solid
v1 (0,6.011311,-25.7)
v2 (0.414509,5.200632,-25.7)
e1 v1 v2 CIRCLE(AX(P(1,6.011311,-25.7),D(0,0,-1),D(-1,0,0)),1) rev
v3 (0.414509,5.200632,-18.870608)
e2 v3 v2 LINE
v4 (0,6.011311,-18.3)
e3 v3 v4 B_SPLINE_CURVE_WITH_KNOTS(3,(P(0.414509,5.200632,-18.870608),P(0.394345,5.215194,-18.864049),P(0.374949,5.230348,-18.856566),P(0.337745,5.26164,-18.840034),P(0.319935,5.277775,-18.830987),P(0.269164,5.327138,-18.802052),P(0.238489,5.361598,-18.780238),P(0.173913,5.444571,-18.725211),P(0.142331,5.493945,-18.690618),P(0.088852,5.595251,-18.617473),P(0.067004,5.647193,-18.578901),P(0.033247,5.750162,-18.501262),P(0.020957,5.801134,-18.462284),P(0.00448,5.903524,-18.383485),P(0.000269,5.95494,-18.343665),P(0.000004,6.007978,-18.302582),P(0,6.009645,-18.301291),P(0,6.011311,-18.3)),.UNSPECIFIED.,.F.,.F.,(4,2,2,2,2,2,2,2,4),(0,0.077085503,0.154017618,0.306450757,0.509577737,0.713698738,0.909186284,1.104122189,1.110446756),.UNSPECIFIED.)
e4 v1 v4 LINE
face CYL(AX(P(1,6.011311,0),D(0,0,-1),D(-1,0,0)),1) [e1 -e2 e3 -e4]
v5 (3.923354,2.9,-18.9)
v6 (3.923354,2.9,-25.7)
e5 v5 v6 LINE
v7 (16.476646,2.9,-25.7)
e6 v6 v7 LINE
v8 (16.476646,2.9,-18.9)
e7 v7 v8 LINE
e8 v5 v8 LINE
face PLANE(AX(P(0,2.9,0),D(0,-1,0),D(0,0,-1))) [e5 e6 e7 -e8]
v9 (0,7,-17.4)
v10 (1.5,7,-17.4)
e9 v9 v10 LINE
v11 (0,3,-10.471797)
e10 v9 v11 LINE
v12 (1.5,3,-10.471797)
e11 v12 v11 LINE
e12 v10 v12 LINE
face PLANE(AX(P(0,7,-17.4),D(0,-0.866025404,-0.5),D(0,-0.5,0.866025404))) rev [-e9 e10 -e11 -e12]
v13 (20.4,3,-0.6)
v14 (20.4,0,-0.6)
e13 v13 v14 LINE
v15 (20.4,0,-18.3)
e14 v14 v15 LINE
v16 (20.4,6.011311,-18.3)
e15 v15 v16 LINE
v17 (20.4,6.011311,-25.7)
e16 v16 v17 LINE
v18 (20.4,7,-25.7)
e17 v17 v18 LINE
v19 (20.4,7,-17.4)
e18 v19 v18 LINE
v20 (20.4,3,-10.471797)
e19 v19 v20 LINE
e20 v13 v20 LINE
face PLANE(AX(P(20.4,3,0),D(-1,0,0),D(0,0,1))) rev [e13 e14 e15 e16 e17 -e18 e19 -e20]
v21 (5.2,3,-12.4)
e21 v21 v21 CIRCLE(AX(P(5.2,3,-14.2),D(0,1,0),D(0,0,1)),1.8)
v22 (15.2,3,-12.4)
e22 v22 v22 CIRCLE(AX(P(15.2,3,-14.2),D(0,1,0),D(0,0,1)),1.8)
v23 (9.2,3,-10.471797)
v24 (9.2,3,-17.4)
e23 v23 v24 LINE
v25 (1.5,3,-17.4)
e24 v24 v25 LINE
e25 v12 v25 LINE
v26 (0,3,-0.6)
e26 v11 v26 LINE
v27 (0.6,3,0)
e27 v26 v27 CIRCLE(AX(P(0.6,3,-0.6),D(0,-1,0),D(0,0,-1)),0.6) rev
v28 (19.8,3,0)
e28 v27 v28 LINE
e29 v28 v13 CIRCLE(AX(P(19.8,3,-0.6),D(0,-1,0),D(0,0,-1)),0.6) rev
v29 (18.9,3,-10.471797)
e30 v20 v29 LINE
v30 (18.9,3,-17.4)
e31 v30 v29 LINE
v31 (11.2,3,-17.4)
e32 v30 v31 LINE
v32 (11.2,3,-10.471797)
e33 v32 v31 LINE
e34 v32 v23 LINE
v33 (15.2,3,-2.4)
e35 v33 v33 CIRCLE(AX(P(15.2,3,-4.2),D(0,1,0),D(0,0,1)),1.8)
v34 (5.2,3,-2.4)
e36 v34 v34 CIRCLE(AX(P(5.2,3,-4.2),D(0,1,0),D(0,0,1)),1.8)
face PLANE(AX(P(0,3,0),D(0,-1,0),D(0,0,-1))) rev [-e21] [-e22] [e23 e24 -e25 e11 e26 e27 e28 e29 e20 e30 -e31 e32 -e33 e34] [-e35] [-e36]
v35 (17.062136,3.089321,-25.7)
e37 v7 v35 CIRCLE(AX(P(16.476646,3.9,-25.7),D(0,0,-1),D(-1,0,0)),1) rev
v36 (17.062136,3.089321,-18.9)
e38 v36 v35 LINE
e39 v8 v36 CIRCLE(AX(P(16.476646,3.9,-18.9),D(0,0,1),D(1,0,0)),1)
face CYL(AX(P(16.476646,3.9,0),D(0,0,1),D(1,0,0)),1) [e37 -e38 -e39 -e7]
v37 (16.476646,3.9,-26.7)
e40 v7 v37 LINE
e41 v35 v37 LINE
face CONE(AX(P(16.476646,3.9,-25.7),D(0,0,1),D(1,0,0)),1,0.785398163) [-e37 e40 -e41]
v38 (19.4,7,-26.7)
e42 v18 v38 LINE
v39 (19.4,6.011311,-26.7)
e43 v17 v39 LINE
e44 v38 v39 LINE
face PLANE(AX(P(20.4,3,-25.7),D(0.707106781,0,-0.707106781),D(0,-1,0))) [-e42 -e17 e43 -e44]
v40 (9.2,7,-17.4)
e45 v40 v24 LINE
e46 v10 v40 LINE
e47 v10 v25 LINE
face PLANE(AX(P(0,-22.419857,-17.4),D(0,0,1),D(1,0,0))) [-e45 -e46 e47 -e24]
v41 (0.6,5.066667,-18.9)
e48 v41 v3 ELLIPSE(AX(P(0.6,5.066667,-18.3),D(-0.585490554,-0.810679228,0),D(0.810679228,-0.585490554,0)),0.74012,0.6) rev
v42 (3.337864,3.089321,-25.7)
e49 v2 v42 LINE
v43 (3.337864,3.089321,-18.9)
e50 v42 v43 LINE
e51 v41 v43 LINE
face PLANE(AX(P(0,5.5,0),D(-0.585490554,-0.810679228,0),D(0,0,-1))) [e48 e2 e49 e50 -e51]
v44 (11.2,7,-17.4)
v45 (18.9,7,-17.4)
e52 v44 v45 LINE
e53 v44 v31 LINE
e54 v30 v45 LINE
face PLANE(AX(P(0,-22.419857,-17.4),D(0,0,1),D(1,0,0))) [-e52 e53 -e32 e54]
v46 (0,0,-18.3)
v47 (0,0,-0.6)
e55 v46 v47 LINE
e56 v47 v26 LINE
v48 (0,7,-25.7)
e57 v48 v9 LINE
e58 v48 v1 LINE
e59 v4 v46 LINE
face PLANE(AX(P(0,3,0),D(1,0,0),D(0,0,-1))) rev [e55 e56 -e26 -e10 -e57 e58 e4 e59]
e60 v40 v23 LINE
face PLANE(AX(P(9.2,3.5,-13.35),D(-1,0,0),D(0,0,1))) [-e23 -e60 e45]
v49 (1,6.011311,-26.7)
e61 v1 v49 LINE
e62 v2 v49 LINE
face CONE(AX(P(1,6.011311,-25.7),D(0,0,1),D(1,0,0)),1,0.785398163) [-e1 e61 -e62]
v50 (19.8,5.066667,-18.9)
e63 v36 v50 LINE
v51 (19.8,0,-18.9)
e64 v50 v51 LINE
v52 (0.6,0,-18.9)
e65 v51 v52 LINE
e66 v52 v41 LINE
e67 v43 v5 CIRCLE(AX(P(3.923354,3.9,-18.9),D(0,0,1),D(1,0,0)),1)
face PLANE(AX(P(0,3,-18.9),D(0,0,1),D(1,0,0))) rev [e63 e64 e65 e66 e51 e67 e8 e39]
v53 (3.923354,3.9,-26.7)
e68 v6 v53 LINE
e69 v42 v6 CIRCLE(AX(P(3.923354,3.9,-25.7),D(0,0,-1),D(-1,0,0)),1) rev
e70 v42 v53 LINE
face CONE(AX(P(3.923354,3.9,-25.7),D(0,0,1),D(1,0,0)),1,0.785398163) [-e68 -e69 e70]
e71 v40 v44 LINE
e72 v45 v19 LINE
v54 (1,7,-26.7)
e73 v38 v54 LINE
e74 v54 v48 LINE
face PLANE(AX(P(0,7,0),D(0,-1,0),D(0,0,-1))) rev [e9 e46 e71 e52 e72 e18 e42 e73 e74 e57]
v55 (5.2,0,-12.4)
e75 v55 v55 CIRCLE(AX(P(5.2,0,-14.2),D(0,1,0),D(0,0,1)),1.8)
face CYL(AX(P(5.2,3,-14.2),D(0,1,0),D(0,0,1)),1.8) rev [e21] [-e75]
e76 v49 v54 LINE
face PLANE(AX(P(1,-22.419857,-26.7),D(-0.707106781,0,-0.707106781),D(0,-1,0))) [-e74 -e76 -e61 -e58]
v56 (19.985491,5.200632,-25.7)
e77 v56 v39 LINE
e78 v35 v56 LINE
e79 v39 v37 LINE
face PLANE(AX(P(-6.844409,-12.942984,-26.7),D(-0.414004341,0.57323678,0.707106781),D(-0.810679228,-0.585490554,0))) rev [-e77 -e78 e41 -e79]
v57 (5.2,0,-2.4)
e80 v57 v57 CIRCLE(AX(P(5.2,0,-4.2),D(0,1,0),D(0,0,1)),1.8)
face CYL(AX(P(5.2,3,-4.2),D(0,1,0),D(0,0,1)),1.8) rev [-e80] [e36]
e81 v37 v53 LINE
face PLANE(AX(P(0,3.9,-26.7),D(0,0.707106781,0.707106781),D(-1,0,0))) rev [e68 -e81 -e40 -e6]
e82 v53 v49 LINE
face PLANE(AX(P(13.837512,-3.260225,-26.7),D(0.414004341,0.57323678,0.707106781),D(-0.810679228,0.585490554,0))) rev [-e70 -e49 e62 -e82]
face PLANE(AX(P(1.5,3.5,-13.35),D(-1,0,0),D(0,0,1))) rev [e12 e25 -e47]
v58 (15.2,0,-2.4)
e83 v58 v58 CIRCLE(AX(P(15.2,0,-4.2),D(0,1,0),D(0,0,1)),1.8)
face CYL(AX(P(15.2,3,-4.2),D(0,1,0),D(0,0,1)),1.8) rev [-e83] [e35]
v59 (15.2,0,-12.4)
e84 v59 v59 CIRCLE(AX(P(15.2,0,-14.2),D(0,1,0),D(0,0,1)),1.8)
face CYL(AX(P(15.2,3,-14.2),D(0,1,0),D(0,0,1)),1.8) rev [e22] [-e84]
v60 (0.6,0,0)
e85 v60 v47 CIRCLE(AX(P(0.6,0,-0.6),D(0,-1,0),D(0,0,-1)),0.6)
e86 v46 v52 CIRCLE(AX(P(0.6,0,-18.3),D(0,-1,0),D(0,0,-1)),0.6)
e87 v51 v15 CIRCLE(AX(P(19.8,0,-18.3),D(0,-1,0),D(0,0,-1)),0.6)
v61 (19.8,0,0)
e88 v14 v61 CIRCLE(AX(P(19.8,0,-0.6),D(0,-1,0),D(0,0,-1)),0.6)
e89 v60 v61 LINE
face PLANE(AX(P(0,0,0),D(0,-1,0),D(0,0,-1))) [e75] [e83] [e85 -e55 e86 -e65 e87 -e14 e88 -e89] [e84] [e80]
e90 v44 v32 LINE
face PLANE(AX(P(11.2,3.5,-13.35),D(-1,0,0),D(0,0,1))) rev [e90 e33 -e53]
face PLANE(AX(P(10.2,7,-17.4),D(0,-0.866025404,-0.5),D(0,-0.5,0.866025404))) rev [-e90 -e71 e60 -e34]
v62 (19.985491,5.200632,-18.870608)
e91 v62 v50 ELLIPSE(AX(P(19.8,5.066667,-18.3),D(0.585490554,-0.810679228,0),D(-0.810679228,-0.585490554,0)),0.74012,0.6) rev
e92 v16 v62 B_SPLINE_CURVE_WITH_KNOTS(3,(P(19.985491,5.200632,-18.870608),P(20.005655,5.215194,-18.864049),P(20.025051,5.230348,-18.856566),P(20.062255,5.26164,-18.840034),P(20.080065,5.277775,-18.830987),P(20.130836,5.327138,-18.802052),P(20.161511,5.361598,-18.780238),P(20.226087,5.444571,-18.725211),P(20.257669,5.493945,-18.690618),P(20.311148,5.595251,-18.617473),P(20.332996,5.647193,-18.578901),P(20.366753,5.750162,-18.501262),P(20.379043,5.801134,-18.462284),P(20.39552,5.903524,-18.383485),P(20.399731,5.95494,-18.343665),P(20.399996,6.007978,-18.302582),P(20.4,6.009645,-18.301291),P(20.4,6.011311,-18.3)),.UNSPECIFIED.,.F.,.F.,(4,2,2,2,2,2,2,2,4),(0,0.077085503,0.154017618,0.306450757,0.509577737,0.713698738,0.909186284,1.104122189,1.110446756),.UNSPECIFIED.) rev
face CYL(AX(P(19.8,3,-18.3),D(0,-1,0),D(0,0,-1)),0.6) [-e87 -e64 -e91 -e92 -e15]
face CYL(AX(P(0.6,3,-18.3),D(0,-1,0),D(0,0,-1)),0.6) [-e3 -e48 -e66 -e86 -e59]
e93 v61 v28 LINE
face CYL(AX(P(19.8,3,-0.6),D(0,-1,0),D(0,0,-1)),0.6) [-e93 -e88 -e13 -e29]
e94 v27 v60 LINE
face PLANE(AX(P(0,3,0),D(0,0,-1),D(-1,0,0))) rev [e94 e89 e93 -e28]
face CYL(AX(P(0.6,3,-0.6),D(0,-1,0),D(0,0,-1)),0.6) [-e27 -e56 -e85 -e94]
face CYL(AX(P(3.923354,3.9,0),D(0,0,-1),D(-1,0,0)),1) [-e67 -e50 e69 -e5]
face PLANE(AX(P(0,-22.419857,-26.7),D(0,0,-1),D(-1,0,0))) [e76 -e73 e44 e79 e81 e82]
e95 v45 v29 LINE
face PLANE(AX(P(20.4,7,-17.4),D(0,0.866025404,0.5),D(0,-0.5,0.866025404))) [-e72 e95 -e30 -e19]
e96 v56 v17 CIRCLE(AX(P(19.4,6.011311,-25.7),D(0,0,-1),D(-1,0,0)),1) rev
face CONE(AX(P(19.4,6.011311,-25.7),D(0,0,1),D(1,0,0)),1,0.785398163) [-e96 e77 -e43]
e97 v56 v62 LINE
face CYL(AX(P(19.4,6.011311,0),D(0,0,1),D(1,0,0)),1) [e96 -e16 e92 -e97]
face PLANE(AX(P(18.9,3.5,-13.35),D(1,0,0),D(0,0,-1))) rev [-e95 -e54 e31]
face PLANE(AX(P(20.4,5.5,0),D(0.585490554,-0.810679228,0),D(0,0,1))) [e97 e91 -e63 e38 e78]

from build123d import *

# Parameters (mm, degrees)
SKETCH1_W                = 20.4
SKETCH1_H                = 18.9
BOSS_EXTRUDE1_DEPTH      = 3
M3_CLEARANCE_HOLE1_D     = 3.6
SKETCH4_W                = 20.4
SKETCH4_H                = 2.4
BOSS_EXTRUDE2_DEPTH      = 1.5
BOSS_EXTRUDE3_DEPTH      = 4
BOSS_EXTRUDE3_DEPTH_BACK = 0.1
SKETCH5_W                = 20.4
SKETCH5_H                = 9.3
CHAMFER1_SIZE            = 3.6
CHAMFER1_SIZE2           = 2.6
FILLET2_R                = 1
CHAMFER3_SIZE            = 1
FILLET1_R                = 0.6
RIB1_REACH               = 31.427
SKETCH7_WALL_W           = 68.853377202
SKETCH7_WALL_H           = 2
RIB2_START               = -1.5
RIB2_DEPTH               = 1.5
RIB10_REACH              = 36.323
SKETCH9_WALL_W           = 78.645466102
SKETCH9_WALL_H           = 1.5


# Read off the part's stored shape, not the designer's step: Rib2
with BuildPart() as part:
    # Sketch1 → Boss-Extrude1 (new body)
    with BuildSketch(Plane(origin=(0, 0, 0), x_dir=(1, 0, 0), z_dir=(0, 1, 0))):
        with Locations((10.2, 9.45)):
            Rectangle(SKETCH1_W, SKETCH1_H)
    extrude(amount=BOSS_EXTRUDE1_DEPTH)

    # M3 Clearance Hole1 (through all)
    with Locations(Plane(origin=(0, 3, 0), x_dir=(1, 0, 0), z_dir=(0, 1, 0))):
        with Locations((5.2, 4.2), (5.2, 14.2), (15.2, 14.2), (15.2, 4.2)):
            Hole(M3_CLEARANCE_HOLE1_D / 2)

    # Sketch4 → Boss-Extrude2 (add)
    with BuildSketch(Plane(origin=(0, 0, -18.9), x_dir=(-1, 0, 0), z_dir=(0, 0, -1))):
        with Locations((-10.2, 1.2)):
            Rectangle(SKETCH4_W, SKETCH4_H)
    extrude(amount=-BOSS_EXTRUDE2_DEPTH)

    # Sketch5 → Boss-Extrude3 (add, two sides: drawn at the far end of the back side and taken through both)
    with BuildSketch(Plane(origin=(0, 3, 0), x_dir=(1, 0, 0), z_dir=(0, 1, 0)).offset(-BOSS_EXTRUDE3_DEPTH_BACK)):
        with Locations((10.2, 22.05)):
            Rectangle(SKETCH5_W, SKETCH5_H)
    extrude(amount=BOSS_EXTRUDE3_DEPTH + BOSS_EXTRUDE3_DEPTH_BACK)

    # Chamfer1
    chamfer1_edges = [part.edges().sort_by_distance(p)[0] for p in [
        (20.4, 2.9, -22.8),
        (0, 2.9, -22.8),
    ]]
    chamfer1_side = [part.faces().sort_by_distance(p)[0] for p in [
        (10.2, 2.9, -22.8),
    ]]
    chamfer(chamfer1_edges, length=CHAMFER1_SIZE, length2=CHAMFER1_SIZE2, reference=chamfer1_side[0])

    # Fillet2
    fillet2_edges = [part.edges().sort_by_distance(p)[0] for p in [
        (20.4, 5.5, -22.8),
        (3.6, 2.9, -22.8),
        (16.8, 2.9, -22.8),
        (0, 5.5, -22.8),
    ]]
    fillet(fillet2_edges, radius=FILLET2_R)

    # Chamfer3
    chamfer3_edges = [part.edges().sort_by_distance(p)[0] for p in [
        (16.784315179, 2.94850664, -26.7),
        (20.290362441, 5.556058922, -26.7),
        (20.4, 6.505655648, -26.7),
        (18.523813503, 4.144976419, -26.7),
        (10.2, 2.9, -26.7),
        (1.876186497, 4.144976419, -26.7),
        (0, 6.505655648, -26.7),
        (0.109637559, 5.556058922, -26.7),
        (3.615684821, 2.94850664, -26.7),
    ]]
    chamfer(chamfer3_edges, length=CHAMFER3_SIZE - 0.0001)  # a hair under: the kernel refuses the full size

    # Fillet1
    fillet1_edges = [part.edges().sort_by_distance(p)[0] for p in [
        (0, 1.5, 0),
        (20.4, 1.5, 0),
        (20.4, 3.005655648, -18.9),
        (0, 3.005655648, -18.9),
    ]]
    fillet(fillet1_edges, radius=FILLET1_R)

    # Sketch7 wall → Rib1 (add, up to next)
    with BuildSketch(Plane(origin=(10.2, 5, -13.935898385), x_dir=(0, -0.500000000015, 0.866025403776), z_dir=(0, 0.866025403776, 0.500000000015)), mode=Mode.PRIVATE) as rib1_sk1:
        Rectangle(SKETCH7_WALL_W, SKETCH7_WALL_H)
    rib1_tool1 = extrude(rib1_sk1.sketch, amount=-RIB1_REACH, mode=Mode.PRIVATE) - part.part
    add(rib1_tool1.solids().sort_by_distance((10.2, 5, -13.935898385))[0])

    # Rib2 outline → Rib2 (add)
    with BuildSketch(Plane.ZY.offset(RIB2_START)):
        Polygon((-10.47179677, 3), (-17.4, 7), (-17.4, 3), align=None)
    extrude(amount=RIB2_DEPTH)

    # Sketch9 wall → Rib10 (add, up to next)
    with BuildSketch(Plane(origin=(20.4, 5, -13.935898385), x_dir=(0, -0.500000000015, 0.866025403776), z_dir=(0, -0.866025403776, -0.500000000015)), mode=Mode.PRIVATE) as rib10_sk1:
        with Locations((0, 0.75)):
            Rectangle(SKETCH9_WALL_W, SKETCH9_WALL_H)
    rib10_tool1 = extrude(rib10_sk1.sketch, amount=RIB10_REACH, mode=Mode.PRIVATE) - part.part
    add(rib10_tool1.solids().sort_by_distance((20.4, 5, -13.935898385))[0])


solid = part.part
